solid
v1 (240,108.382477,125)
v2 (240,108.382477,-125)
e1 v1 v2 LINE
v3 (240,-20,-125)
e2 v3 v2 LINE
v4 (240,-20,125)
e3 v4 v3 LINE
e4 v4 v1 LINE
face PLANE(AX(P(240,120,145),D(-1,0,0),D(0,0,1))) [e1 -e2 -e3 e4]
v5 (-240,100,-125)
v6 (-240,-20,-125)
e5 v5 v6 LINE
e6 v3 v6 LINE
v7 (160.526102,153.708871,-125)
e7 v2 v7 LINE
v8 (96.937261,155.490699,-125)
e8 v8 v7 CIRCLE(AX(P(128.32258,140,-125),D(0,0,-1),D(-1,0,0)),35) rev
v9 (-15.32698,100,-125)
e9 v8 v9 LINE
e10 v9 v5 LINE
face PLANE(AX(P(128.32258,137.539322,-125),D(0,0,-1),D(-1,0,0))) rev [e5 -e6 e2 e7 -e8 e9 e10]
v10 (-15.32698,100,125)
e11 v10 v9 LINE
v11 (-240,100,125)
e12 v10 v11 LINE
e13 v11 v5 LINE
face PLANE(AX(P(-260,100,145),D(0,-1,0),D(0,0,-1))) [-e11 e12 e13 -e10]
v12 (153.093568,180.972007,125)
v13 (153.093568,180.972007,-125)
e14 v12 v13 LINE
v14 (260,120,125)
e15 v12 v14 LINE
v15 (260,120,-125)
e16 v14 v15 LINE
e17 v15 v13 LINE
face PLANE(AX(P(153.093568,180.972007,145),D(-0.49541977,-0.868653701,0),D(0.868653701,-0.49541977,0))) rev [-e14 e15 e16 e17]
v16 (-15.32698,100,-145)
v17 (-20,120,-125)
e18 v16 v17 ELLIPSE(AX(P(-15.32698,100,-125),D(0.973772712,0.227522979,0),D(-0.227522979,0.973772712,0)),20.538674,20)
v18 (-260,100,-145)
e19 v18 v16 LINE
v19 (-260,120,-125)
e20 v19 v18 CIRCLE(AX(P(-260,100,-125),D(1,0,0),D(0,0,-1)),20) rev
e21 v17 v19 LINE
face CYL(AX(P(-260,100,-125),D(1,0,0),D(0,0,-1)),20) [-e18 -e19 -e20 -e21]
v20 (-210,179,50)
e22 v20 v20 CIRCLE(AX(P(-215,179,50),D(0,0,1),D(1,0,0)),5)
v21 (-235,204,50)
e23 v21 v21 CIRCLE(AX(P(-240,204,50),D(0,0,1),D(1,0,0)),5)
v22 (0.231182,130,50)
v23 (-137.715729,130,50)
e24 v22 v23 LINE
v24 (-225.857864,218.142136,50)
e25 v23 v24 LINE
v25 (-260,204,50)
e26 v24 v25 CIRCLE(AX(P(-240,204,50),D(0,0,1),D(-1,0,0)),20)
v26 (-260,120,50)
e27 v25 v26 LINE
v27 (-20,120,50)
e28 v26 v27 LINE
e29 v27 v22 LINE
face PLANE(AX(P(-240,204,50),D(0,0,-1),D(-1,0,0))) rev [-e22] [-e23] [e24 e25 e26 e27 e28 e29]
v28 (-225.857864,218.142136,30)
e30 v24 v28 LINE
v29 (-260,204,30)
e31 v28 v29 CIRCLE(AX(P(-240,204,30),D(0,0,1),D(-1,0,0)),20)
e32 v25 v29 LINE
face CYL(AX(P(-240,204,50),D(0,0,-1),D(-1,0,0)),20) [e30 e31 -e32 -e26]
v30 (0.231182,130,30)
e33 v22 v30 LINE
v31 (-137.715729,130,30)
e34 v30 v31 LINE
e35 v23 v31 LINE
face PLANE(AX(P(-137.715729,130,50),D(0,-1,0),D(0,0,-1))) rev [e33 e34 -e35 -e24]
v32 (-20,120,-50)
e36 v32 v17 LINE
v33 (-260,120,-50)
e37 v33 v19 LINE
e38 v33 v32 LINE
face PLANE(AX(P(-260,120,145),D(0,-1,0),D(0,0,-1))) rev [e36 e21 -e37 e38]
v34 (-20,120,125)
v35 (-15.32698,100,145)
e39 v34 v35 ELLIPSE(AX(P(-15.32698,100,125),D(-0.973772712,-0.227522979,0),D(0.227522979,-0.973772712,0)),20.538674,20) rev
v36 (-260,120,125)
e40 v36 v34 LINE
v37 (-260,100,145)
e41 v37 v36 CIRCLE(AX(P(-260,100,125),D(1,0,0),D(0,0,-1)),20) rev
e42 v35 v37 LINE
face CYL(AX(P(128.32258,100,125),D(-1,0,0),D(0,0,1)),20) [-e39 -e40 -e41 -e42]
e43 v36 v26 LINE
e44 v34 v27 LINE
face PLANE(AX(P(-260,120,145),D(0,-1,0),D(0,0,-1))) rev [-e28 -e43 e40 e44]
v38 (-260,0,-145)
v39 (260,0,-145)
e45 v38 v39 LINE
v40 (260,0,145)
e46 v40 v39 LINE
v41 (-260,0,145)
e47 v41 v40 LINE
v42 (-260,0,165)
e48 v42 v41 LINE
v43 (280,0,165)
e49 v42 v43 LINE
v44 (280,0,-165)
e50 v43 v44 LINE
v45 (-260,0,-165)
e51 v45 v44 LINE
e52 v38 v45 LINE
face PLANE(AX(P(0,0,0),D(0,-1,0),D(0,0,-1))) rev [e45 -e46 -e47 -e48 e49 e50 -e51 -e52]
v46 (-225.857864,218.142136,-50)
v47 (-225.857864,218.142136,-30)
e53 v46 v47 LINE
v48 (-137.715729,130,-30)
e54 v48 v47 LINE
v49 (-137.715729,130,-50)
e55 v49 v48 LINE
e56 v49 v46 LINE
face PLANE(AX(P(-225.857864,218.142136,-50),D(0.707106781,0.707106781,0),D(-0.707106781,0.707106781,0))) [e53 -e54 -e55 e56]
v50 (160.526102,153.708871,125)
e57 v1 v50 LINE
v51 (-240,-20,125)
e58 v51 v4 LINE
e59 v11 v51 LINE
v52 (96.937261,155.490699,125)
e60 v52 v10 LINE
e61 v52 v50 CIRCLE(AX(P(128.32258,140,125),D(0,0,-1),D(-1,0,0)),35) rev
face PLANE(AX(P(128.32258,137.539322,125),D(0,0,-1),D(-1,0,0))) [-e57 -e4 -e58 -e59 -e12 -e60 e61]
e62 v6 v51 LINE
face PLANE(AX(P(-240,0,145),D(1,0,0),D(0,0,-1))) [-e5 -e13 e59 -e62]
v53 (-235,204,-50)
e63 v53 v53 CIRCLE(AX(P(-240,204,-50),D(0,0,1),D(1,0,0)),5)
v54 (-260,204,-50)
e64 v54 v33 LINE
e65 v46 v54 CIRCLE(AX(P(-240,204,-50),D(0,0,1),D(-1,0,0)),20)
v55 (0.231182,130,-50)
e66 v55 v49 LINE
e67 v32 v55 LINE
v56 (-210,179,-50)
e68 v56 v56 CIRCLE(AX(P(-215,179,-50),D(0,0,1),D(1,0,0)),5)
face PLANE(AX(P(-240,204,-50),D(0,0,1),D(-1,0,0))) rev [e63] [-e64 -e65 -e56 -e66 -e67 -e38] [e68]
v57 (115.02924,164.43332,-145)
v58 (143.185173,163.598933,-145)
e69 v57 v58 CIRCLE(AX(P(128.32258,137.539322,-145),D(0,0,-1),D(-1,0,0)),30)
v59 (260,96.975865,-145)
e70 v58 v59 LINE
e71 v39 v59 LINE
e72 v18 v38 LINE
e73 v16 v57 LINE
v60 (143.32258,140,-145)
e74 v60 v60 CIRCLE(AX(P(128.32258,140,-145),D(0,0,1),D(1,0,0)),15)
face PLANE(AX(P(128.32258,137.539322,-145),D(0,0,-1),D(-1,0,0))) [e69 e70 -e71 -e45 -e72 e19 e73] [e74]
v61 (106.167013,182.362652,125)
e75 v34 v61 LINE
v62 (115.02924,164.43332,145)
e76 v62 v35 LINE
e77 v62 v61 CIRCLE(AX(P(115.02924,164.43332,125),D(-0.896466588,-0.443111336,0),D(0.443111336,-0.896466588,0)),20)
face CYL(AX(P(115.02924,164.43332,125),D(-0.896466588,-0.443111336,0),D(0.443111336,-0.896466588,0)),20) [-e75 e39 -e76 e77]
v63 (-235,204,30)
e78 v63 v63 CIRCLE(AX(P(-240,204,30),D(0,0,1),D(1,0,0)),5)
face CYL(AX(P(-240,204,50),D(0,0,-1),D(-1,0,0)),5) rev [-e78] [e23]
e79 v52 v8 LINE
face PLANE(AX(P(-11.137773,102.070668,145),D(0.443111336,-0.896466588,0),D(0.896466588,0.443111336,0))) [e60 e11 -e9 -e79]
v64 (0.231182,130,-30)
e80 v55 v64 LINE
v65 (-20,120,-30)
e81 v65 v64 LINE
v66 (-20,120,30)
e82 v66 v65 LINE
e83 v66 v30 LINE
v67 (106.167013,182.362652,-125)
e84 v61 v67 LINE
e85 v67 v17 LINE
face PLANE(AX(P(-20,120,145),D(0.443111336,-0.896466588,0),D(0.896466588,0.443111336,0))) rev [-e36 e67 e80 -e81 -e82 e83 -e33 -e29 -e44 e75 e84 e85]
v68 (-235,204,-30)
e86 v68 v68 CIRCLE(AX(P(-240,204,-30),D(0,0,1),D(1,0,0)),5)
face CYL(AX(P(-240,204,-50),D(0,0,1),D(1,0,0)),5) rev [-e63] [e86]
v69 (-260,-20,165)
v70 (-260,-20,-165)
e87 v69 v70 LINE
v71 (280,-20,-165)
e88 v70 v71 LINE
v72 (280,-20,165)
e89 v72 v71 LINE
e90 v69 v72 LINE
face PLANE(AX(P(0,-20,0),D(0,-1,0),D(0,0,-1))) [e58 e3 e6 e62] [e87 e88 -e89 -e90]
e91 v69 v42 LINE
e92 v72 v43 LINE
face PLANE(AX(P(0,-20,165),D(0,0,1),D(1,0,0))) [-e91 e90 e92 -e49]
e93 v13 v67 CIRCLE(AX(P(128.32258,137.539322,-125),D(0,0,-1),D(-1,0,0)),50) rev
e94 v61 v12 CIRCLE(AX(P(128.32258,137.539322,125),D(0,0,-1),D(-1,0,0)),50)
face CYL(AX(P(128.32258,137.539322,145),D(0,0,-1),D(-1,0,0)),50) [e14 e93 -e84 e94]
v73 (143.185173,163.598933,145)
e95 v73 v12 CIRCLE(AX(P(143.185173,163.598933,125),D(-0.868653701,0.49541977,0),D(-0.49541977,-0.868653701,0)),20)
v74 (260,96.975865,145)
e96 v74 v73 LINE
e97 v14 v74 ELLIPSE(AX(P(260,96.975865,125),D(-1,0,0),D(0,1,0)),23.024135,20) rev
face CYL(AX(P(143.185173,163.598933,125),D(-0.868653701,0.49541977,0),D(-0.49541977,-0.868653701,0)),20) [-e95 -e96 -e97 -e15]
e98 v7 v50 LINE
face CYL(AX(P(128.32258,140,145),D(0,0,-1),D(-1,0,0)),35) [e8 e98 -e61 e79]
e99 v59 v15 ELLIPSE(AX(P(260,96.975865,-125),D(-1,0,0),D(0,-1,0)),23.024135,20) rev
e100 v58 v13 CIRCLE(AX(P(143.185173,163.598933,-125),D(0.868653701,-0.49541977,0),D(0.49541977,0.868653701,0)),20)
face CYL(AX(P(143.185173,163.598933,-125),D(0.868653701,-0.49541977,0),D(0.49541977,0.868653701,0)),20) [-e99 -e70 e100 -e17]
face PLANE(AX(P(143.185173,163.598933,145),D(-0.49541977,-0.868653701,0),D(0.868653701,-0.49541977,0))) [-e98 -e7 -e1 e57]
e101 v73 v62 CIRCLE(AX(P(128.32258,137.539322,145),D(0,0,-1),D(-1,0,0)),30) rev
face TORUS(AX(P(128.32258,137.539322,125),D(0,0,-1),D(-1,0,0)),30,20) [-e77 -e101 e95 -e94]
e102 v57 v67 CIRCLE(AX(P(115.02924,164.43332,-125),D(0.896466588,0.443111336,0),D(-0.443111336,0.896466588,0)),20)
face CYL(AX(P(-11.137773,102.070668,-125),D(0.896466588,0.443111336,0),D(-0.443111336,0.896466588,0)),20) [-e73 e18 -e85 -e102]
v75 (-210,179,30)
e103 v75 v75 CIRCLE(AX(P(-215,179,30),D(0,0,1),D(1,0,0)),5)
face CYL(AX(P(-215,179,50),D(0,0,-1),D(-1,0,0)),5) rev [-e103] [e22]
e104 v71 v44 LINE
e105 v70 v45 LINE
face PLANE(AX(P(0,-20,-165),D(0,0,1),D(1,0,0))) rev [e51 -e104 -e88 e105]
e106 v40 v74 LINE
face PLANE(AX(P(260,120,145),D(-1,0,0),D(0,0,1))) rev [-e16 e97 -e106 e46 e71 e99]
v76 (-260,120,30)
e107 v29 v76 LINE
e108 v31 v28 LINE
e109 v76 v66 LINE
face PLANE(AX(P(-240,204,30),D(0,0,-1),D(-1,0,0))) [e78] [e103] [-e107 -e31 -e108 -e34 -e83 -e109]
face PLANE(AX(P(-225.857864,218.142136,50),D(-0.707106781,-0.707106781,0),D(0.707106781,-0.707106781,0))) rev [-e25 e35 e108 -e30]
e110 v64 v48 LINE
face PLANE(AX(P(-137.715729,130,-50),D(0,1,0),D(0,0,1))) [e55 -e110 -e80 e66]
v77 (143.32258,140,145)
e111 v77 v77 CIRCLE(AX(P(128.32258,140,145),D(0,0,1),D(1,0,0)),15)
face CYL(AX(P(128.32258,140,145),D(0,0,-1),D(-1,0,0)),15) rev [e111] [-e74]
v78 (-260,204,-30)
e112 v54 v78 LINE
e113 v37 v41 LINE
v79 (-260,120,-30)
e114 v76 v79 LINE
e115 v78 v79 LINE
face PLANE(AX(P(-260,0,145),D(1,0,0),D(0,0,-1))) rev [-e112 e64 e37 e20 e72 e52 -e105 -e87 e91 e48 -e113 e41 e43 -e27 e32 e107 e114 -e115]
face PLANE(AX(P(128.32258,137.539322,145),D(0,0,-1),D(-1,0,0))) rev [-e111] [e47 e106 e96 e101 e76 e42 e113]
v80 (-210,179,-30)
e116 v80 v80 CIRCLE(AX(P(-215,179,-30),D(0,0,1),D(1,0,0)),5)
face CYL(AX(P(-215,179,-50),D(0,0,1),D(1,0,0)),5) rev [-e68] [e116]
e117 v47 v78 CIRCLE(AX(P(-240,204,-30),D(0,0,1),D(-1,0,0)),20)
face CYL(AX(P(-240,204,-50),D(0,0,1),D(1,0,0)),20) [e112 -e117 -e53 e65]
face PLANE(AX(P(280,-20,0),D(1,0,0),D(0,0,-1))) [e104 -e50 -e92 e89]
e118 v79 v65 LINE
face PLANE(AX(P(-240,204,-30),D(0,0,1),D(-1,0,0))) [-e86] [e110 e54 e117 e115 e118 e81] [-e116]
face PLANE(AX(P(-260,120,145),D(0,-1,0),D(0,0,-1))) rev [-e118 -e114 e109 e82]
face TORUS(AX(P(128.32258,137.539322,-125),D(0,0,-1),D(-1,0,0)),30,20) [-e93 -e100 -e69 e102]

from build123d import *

# Parameters (mm, degrees)
SKETCH1_R           = 15
BOSS_EXTRUDE1_DEPTH = 145
BOSS_EXTRUDE2_START = 30
SKETCH2_R           = 5
BOSS_EXTRUDE2_DEPTH = 20
SHELL1_START        = -125
SHELL1_DEPTH        = 250
SKETCH3_W           = 520
SKETCH3_H           = 290
BOSS_EXTRUDE3_DEPTH = 20
FILLET1_R           = 20


# Read off the part's stored shape, not the designer's step: Shell1
with BuildPart() as part:
    # Sketch1 → Boss-Extrude1 (new, symmetric)
    with BuildSketch(Plane.XY):
        with BuildLine():
            Line((-260, 0), (260, 0))
            Line((260, 0), (260, 120))
            Line((260, 120), (153.093568272, 180.972007347))
            ThreePointArc((153.093568272, 180.972007347), (129.803653925, 187.517381697), (106.167012988, 182.362651739))
            Line((106.167012988, 182.362651739), (-20, 120))
            Line((-20, 120), (-260, 120))
            Line((-260, 120), (-260, 0))
        make_face()
        with Locations((128.322579774, 140)):
            Circle(SKETCH1_R, mode=Mode.SUBTRACT)
    extrude(amount=BOSS_EXTRUDE1_DEPTH, both=True)

    # Sketch2 → Boss-Extrude2 (add)
    with BuildSketch(Plane.XY.offset(BOSS_EXTRUDE2_START)):
        with BuildLine():
            Line((-260, 120), (-260, 204))
            ThreePointArc((-260, 204), (-247.653668647, 222.47759065), (-225.857864376, 218.142135624))
            Line((-225.857864376, 218.142135624), (-137.715728753, 130))
            Line((-137.715728753, 130), (0.23118156, 130))
            Line((0.23118156, 130), (-20, 120))
            Line((-20, 120), (-260, 120))
        make_face()
        with Locations((-240, 204)):
            Circle(SKETCH2_R, mode=Mode.SUBTRACT)
        with Locations((-215, 179)):
            Circle(SKETCH2_R, mode=Mode.SUBTRACT)
    boss_extrude2 = extrude(amount=BOSS_EXTRUDE2_DEPTH)

    # Mirror1: Boss-Extrude2 across plane
    add(boss_extrude2.mirror(Plane.XY))

    # Shell1 outline → Shell1 (cut)
    with BuildSketch(Plane.XY.offset(SHELL1_START)):
        with BuildLine():
            Line((96.937260838, 155.490698991), (-15.32697978, 100))
            Line((-15.32697978, 100), (-240, 100))
            Line((-240, 100), (-240, 0))
            Line((-240, 0), (240, 0))
            Line((240, 0), (240, 108.382476706))
            Line((240, 108.382476706), (160.526102167, 153.708871052))
            ThreePointArc((160.526102167, 153.708871052), (127.342226815, 105.013732579), (96.937260838, 155.490698991))
        make_face()
    extrude(amount=SHELL1_DEPTH, mode=Mode.SUBTRACT)

    # Sketch3 → Boss-Extrude3 (add)
    # profile 1 of 2: a face of its own
    with BuildSketch(Plane.XZ):
        Rectangle(SKETCH3_W, SKETCH3_H)
        Polygon((160.526102167, -125), (-240, -125), (-240, 125), (-15.32697978, 125), (93.322579774, 125), (96.937260838, 125), (163.322579774, 125), (240, 125), (240, -125), align=None, mode=Mode.SUBTRACT)
    # profile 2 of 2: a face of its own
    with BuildSketch(Plane.XZ):
        Polygon((280, 165), (-260, 165), (-260, 145), (260, 145), (260, -145), (-260, -145), (-260, -165), (280, -165), align=None)
    extrude(amount=BOSS_EXTRUDE3_DEPTH)

    # Fillet1
    fillet1_edges = [part.edges().sort_by_distance(p)[0] for p in [
        (129.803653925, 187.517381697, -145),
        (-140, 120, 145),
        (206.546784136, 150.486003673, 145),
        (129.803653925, 187.517381697, 145),
        (206.546784136, 150.486003673, -145),
        (43.083506494, 151.181325869, 145),
        (-140, 120, -145),
        (43.083506494, 151.181325869, -145),
    ]]
    fillet(fillet1_edges, radius=FILLET1_R)


solid = part.part
